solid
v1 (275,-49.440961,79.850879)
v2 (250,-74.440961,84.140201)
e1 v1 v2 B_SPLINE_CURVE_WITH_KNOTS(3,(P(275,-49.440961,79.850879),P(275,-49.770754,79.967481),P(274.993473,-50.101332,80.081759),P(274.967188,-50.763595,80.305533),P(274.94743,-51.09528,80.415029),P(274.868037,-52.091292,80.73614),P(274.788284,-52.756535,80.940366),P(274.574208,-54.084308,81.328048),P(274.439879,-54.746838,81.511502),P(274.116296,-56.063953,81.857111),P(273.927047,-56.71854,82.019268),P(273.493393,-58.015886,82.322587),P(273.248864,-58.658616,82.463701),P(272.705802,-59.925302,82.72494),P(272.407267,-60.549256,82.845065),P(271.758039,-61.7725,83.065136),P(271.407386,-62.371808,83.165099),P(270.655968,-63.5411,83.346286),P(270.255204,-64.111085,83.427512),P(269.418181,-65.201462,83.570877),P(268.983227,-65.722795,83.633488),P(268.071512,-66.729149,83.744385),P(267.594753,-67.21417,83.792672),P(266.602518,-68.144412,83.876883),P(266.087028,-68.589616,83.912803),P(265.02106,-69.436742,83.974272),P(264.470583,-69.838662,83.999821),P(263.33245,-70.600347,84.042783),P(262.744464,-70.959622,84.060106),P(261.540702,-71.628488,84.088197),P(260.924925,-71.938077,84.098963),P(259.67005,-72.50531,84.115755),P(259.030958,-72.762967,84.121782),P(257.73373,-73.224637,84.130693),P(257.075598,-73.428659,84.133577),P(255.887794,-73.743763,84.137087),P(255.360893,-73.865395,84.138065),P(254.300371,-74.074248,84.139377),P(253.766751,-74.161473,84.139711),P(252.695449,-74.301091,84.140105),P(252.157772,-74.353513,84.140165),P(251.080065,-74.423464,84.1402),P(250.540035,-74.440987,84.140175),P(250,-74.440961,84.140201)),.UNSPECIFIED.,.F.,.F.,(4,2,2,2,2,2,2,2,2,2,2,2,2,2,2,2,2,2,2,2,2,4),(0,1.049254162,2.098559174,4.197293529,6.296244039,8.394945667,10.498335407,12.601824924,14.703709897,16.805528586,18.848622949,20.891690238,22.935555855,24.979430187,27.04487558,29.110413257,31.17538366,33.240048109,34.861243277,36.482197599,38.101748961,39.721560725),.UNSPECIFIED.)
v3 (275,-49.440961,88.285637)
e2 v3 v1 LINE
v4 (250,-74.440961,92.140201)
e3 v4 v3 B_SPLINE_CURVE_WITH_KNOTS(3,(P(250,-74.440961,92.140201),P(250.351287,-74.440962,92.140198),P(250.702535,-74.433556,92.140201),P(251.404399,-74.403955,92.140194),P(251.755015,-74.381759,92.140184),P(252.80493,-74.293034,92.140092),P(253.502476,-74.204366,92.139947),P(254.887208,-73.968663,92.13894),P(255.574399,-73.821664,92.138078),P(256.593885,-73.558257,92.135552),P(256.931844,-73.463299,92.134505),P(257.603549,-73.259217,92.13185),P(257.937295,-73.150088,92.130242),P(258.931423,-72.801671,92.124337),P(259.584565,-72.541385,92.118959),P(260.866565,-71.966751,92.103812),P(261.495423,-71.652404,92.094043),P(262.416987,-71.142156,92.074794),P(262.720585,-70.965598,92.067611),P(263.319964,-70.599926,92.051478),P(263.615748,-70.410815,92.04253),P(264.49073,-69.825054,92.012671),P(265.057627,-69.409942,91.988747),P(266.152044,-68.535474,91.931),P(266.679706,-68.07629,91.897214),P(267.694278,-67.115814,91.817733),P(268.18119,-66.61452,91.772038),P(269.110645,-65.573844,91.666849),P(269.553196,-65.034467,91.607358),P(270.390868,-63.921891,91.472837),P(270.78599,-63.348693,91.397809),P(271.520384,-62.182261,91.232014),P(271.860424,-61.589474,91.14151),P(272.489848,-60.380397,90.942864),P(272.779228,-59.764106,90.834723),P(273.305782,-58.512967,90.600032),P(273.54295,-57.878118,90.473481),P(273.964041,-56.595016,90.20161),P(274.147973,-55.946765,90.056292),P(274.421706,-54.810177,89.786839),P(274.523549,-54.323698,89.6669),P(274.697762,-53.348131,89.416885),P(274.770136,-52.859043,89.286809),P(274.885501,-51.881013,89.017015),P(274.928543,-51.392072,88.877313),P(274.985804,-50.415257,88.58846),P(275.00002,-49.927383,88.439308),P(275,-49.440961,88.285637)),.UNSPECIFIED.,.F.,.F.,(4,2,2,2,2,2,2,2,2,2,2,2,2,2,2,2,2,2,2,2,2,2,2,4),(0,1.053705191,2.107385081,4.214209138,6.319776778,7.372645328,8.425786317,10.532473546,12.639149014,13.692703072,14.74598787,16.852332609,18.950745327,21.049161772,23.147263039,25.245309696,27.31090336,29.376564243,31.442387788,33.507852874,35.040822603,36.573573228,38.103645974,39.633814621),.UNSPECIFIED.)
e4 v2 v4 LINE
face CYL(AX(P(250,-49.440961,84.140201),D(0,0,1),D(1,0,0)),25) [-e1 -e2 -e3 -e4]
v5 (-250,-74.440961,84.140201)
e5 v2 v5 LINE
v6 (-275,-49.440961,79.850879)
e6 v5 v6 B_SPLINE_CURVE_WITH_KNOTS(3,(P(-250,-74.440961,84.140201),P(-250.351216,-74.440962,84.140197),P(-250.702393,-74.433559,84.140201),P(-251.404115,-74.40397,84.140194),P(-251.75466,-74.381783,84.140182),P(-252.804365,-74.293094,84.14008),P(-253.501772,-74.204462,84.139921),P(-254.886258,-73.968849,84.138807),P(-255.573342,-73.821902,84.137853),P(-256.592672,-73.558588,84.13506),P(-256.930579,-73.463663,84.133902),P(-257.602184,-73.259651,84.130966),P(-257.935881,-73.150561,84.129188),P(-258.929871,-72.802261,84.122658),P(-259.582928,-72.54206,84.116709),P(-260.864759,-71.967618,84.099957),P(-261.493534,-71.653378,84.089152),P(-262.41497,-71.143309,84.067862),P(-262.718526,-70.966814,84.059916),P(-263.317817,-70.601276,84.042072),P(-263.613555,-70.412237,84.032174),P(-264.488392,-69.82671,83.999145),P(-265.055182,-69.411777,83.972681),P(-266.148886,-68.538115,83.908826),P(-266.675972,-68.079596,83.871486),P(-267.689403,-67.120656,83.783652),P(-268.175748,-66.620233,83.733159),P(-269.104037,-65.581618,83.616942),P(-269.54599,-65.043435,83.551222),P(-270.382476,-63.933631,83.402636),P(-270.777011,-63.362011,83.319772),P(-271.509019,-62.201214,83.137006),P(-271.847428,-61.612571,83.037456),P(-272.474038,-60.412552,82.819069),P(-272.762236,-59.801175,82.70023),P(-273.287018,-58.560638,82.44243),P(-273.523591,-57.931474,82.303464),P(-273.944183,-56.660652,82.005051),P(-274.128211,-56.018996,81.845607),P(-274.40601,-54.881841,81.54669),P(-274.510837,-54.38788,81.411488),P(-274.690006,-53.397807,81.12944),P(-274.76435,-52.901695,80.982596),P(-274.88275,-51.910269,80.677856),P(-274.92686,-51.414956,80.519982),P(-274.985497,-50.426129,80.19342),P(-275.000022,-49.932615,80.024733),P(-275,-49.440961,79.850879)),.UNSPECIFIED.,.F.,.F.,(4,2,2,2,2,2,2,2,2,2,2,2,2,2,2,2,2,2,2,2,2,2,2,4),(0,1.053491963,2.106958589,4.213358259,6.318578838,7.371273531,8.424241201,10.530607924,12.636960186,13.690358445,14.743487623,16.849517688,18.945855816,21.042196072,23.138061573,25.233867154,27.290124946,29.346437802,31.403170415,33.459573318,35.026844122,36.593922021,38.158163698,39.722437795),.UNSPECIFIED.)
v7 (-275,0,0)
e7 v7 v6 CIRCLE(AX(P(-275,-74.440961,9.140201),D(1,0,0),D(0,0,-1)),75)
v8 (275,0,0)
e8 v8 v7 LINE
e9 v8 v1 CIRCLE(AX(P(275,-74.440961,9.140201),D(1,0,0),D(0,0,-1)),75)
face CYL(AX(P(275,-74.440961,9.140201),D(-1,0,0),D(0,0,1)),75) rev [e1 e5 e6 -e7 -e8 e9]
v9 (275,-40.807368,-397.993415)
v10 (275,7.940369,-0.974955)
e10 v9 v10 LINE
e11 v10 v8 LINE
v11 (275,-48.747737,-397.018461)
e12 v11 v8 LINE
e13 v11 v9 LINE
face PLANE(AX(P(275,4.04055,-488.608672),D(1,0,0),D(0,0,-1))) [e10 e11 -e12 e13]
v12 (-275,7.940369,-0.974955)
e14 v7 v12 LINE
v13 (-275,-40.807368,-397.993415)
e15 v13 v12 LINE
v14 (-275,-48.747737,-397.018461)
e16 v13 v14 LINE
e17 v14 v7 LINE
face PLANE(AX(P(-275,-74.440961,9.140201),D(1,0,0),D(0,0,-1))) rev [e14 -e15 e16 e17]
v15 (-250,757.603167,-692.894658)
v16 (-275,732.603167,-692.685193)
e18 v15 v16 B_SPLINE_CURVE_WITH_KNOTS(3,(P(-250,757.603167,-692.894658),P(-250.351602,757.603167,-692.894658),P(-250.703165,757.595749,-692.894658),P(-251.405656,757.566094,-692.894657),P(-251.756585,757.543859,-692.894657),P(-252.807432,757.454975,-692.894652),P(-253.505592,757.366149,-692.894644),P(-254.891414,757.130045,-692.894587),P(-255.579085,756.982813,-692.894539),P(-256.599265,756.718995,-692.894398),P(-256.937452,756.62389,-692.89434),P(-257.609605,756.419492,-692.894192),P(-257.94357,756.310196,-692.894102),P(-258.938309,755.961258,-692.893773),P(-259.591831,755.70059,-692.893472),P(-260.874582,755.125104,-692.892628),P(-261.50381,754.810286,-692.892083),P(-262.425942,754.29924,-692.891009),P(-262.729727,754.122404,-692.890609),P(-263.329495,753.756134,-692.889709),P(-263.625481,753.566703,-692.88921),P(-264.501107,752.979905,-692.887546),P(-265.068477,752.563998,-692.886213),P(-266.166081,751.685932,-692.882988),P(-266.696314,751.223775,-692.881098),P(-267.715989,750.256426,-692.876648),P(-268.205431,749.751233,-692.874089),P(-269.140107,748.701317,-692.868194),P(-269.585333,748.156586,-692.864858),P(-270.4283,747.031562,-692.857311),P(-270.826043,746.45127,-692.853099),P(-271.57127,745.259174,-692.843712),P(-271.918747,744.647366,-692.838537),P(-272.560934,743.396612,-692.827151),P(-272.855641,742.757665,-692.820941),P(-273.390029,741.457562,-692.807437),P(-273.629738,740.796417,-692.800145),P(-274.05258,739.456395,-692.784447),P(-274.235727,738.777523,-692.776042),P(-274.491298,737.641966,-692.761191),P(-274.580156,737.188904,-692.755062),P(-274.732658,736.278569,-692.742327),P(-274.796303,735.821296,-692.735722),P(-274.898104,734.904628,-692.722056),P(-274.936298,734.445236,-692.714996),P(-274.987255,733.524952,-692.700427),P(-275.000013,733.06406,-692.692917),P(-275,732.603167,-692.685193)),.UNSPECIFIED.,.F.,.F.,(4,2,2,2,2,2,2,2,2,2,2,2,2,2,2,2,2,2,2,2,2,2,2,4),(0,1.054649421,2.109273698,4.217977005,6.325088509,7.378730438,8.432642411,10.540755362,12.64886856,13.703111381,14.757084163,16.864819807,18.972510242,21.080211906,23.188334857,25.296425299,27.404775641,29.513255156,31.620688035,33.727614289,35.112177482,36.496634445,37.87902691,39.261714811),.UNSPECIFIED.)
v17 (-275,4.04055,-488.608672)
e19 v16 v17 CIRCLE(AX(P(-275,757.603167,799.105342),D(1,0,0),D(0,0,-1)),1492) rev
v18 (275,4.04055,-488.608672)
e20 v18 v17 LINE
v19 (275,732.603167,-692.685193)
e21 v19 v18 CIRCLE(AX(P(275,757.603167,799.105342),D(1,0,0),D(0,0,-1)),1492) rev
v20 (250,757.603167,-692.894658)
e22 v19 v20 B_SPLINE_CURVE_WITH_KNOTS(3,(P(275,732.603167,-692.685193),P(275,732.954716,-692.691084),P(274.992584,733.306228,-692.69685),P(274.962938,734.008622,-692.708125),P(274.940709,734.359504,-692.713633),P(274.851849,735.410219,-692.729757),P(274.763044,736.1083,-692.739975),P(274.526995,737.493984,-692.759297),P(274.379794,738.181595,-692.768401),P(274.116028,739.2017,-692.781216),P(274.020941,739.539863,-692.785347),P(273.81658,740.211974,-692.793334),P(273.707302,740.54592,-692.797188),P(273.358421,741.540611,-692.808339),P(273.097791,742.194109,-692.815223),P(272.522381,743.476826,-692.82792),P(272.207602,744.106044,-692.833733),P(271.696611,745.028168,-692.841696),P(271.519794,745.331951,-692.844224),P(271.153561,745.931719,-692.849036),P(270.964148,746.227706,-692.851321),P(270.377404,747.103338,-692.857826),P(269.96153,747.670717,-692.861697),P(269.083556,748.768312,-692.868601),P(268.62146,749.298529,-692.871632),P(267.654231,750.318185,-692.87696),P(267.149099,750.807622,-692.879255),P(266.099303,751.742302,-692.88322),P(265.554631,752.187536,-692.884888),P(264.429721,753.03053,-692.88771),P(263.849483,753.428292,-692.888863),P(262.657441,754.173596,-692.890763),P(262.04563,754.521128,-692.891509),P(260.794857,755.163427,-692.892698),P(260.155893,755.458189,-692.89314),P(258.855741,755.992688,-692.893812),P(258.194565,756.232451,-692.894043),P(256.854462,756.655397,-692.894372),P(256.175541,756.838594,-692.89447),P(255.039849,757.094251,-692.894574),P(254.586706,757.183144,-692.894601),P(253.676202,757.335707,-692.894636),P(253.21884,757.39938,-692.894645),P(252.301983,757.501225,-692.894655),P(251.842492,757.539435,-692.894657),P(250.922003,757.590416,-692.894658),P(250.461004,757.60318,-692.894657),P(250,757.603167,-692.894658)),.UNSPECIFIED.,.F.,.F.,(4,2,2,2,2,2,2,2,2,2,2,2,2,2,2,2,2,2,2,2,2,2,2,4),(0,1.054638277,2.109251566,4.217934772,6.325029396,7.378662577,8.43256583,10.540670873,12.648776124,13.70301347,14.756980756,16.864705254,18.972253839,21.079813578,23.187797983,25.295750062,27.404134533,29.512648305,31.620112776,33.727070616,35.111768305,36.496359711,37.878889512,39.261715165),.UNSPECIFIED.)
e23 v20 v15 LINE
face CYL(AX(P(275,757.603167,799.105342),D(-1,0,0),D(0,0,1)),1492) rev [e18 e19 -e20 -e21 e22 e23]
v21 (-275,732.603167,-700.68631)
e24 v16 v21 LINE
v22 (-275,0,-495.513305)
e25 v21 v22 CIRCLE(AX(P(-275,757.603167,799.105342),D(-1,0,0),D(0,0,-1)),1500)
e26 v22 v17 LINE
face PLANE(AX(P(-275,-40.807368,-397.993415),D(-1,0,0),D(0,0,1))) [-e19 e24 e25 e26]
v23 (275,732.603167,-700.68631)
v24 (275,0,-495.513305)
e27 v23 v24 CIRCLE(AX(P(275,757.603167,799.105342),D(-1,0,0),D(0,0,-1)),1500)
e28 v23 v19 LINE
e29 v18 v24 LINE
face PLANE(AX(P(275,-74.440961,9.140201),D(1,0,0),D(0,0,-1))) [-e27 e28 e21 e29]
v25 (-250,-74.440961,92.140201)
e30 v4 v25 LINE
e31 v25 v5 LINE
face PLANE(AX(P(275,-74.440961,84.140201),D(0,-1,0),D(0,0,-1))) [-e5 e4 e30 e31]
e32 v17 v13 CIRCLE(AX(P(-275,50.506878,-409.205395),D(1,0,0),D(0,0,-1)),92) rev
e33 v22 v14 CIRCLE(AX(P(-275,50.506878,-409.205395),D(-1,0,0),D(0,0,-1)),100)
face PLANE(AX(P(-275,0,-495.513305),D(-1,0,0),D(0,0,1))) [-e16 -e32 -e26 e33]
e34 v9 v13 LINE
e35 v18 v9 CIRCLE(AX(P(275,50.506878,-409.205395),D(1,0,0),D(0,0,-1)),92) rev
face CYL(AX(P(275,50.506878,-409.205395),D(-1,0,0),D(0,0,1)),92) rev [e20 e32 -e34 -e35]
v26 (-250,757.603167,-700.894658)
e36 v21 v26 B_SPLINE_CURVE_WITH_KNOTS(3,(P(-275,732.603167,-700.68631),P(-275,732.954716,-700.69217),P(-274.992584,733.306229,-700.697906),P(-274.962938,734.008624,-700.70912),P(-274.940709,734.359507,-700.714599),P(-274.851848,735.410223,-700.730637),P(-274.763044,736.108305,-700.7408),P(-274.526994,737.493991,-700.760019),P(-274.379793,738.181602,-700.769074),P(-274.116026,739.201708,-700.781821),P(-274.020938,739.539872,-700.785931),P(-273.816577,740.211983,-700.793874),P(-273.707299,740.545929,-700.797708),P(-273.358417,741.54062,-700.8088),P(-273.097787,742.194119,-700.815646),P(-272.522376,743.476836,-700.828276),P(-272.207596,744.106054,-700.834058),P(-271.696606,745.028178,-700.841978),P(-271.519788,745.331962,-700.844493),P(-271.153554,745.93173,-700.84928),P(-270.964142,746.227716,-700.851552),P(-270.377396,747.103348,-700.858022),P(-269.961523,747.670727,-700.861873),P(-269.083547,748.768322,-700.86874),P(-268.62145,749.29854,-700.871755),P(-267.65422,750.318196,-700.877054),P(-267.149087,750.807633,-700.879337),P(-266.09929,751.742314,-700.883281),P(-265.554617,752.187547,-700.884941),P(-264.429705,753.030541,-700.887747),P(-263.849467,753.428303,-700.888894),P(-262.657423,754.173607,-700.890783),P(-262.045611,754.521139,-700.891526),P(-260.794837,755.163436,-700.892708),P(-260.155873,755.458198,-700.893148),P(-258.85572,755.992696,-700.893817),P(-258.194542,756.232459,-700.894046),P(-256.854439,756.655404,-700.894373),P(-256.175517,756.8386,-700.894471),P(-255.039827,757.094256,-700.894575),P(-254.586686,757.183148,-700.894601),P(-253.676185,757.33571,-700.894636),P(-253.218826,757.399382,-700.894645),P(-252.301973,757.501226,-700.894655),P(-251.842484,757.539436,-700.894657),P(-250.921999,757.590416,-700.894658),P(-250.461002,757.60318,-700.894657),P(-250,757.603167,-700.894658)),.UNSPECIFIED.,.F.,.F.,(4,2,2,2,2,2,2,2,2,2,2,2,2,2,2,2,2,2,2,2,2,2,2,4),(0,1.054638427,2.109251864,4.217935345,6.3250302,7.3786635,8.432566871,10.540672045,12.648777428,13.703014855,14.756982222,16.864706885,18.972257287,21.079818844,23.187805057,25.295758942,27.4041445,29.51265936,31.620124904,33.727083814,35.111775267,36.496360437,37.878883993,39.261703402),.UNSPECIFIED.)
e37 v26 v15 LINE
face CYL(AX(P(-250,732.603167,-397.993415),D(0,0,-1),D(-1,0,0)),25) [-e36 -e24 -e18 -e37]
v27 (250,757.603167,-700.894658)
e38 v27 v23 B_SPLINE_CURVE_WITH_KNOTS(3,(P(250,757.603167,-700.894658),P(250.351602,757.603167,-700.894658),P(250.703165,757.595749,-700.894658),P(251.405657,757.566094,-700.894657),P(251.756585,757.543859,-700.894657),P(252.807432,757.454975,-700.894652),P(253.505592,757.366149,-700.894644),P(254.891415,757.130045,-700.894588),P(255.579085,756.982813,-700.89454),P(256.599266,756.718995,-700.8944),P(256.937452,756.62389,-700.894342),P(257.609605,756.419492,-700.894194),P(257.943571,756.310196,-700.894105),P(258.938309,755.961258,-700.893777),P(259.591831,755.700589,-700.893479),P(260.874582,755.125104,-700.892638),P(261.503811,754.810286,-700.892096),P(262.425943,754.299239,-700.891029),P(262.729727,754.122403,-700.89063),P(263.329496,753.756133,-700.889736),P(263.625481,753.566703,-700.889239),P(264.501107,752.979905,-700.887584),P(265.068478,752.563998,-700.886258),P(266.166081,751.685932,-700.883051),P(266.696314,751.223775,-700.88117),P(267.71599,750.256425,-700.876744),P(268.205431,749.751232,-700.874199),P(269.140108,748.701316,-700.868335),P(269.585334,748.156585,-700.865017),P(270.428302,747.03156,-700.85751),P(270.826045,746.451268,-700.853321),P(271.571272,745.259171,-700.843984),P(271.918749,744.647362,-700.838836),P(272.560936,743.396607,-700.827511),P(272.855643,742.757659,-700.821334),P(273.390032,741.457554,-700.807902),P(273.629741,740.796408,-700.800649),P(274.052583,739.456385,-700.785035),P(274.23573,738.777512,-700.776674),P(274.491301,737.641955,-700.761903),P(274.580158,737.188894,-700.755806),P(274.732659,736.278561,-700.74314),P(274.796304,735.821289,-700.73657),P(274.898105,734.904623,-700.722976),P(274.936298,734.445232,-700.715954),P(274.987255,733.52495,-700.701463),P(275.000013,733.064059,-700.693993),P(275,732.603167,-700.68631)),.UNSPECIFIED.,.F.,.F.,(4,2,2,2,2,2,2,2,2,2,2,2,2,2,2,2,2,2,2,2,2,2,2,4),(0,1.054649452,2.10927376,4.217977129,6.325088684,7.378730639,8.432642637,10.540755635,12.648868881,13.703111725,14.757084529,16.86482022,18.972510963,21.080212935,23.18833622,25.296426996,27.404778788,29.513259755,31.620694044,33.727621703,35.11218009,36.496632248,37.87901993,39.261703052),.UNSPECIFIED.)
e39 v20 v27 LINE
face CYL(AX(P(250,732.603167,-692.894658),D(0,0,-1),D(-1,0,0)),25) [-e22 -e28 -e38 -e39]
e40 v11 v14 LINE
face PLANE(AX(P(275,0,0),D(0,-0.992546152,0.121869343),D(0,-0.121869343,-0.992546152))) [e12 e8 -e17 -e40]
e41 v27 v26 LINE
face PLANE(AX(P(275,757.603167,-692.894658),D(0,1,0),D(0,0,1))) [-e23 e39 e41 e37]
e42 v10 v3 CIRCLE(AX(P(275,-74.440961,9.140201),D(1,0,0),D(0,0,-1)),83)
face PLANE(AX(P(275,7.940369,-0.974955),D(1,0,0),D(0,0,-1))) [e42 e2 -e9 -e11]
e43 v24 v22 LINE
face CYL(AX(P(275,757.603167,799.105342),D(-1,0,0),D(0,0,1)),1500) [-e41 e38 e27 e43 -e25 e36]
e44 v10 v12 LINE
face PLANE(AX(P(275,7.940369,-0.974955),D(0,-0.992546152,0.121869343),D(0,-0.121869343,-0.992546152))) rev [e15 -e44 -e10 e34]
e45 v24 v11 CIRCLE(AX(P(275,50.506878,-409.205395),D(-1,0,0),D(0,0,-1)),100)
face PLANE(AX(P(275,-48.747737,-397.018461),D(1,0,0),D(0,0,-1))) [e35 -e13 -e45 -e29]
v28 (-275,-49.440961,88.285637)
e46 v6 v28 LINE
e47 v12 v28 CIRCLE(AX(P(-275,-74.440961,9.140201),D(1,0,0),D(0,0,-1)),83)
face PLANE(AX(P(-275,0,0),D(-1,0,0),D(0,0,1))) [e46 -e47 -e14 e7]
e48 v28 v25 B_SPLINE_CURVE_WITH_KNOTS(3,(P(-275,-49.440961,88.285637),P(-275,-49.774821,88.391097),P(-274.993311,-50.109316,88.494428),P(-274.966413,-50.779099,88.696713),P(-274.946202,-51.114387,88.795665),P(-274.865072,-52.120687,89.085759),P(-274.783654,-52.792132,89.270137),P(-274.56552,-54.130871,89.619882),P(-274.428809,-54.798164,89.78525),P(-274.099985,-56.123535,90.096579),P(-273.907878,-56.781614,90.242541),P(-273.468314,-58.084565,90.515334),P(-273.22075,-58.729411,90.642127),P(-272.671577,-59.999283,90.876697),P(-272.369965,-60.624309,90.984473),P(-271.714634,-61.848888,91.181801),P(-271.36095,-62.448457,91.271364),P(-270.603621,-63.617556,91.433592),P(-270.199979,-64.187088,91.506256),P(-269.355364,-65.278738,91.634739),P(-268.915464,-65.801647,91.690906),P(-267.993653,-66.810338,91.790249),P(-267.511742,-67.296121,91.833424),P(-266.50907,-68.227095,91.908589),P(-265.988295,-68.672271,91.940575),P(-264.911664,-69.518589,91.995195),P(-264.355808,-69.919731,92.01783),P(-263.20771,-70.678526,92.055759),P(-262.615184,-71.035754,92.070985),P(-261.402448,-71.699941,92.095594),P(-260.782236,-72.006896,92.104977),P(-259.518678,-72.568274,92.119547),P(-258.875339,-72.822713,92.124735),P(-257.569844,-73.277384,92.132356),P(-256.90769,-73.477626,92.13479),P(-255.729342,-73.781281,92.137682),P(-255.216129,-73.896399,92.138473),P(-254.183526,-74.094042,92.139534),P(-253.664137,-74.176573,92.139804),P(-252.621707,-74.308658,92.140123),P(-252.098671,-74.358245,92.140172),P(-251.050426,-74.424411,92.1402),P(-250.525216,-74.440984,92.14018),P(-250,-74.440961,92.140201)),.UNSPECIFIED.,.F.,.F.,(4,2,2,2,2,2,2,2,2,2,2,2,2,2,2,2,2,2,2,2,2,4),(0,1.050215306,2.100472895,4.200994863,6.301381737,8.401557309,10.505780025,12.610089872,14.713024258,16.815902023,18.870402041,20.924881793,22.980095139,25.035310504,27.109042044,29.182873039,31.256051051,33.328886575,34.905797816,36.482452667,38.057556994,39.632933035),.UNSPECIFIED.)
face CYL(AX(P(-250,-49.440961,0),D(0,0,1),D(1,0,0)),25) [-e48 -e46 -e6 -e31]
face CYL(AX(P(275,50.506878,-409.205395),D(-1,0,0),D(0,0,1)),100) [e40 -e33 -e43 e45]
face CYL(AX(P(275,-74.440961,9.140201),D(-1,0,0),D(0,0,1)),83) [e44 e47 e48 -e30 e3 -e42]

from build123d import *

# Parameters (mm, degrees)
ODGI_CIE_START         = -275
ODGI_CIE_BAZOWE1_DEPTH = 550
ZAOKR_GLENIE1_R        = 25


# Read off the part's stored shape, not the designer's step: Odgięcie bazowe1
with BuildPart() as part:
    # Odgięcie bazowe1 outline → Odgięcie bazowe1 (new body)
    with BuildSketch(Plane(origin=(0, 0, 0), x_dir=(0, 0, -1), z_dir=(1, 0, 0)).offset(ODGI_CIE_START)):
        with BuildLine():
            ThreePointArc((0.974954747, 7.940369213), (-64.137664757, -12.277636548), (-92.140200755, -74.440961373))
            Line((-92.140200755, -74.440961373), (-84.140200755, -74.440961373))
            ThreePointArc((-84.140200755, -74.440961373), (-58.836704372, -18.269282314), (0, 0))
            Line((0, 0), (397.018460657, -48.747737362))
            ThreePointArc((397.018460657, -48.747737362), (453.562640464, -39.116973792), (495.513304801, 0))
            ThreePointArc((495.513304801, 0), (648.639105254, 365.128945319), (700.894657745, 757.603167031))
            Line((700.894657745, 757.603167031), (692.894657745, 757.603167031))
            ThreePointArc((692.894657745, 757.603167031), (640.917801534, 367.222141168), (488.608672016, 4.040550224))
            ThreePointArc((488.608672016, 4.040550224), (450.014060826, -31.947065665), (397.993415404, -40.807368149))
            Line((397.993415404, -40.807368149), (0.974954747, 7.940369213))
        make_face()
    extrude(amount=ODGI_CIE_BAZOWE1_DEPTH)

    # Zaokrąglenie1
    zaokr_glenie1_edges = [part.edges().sort_by_distance(p)[0] for p in [
        (-275, -74.440961373, 88.140200755),
        (275, 757.603167031, -696.894657745),
        (275, -74.440961373, 88.140200755),
        (-275, 757.603167031, -696.894657745),
    ]]
    fillet(zaokr_glenie1_edges, radius=ZAOKR_GLENIE1_R)


solid = part.part
